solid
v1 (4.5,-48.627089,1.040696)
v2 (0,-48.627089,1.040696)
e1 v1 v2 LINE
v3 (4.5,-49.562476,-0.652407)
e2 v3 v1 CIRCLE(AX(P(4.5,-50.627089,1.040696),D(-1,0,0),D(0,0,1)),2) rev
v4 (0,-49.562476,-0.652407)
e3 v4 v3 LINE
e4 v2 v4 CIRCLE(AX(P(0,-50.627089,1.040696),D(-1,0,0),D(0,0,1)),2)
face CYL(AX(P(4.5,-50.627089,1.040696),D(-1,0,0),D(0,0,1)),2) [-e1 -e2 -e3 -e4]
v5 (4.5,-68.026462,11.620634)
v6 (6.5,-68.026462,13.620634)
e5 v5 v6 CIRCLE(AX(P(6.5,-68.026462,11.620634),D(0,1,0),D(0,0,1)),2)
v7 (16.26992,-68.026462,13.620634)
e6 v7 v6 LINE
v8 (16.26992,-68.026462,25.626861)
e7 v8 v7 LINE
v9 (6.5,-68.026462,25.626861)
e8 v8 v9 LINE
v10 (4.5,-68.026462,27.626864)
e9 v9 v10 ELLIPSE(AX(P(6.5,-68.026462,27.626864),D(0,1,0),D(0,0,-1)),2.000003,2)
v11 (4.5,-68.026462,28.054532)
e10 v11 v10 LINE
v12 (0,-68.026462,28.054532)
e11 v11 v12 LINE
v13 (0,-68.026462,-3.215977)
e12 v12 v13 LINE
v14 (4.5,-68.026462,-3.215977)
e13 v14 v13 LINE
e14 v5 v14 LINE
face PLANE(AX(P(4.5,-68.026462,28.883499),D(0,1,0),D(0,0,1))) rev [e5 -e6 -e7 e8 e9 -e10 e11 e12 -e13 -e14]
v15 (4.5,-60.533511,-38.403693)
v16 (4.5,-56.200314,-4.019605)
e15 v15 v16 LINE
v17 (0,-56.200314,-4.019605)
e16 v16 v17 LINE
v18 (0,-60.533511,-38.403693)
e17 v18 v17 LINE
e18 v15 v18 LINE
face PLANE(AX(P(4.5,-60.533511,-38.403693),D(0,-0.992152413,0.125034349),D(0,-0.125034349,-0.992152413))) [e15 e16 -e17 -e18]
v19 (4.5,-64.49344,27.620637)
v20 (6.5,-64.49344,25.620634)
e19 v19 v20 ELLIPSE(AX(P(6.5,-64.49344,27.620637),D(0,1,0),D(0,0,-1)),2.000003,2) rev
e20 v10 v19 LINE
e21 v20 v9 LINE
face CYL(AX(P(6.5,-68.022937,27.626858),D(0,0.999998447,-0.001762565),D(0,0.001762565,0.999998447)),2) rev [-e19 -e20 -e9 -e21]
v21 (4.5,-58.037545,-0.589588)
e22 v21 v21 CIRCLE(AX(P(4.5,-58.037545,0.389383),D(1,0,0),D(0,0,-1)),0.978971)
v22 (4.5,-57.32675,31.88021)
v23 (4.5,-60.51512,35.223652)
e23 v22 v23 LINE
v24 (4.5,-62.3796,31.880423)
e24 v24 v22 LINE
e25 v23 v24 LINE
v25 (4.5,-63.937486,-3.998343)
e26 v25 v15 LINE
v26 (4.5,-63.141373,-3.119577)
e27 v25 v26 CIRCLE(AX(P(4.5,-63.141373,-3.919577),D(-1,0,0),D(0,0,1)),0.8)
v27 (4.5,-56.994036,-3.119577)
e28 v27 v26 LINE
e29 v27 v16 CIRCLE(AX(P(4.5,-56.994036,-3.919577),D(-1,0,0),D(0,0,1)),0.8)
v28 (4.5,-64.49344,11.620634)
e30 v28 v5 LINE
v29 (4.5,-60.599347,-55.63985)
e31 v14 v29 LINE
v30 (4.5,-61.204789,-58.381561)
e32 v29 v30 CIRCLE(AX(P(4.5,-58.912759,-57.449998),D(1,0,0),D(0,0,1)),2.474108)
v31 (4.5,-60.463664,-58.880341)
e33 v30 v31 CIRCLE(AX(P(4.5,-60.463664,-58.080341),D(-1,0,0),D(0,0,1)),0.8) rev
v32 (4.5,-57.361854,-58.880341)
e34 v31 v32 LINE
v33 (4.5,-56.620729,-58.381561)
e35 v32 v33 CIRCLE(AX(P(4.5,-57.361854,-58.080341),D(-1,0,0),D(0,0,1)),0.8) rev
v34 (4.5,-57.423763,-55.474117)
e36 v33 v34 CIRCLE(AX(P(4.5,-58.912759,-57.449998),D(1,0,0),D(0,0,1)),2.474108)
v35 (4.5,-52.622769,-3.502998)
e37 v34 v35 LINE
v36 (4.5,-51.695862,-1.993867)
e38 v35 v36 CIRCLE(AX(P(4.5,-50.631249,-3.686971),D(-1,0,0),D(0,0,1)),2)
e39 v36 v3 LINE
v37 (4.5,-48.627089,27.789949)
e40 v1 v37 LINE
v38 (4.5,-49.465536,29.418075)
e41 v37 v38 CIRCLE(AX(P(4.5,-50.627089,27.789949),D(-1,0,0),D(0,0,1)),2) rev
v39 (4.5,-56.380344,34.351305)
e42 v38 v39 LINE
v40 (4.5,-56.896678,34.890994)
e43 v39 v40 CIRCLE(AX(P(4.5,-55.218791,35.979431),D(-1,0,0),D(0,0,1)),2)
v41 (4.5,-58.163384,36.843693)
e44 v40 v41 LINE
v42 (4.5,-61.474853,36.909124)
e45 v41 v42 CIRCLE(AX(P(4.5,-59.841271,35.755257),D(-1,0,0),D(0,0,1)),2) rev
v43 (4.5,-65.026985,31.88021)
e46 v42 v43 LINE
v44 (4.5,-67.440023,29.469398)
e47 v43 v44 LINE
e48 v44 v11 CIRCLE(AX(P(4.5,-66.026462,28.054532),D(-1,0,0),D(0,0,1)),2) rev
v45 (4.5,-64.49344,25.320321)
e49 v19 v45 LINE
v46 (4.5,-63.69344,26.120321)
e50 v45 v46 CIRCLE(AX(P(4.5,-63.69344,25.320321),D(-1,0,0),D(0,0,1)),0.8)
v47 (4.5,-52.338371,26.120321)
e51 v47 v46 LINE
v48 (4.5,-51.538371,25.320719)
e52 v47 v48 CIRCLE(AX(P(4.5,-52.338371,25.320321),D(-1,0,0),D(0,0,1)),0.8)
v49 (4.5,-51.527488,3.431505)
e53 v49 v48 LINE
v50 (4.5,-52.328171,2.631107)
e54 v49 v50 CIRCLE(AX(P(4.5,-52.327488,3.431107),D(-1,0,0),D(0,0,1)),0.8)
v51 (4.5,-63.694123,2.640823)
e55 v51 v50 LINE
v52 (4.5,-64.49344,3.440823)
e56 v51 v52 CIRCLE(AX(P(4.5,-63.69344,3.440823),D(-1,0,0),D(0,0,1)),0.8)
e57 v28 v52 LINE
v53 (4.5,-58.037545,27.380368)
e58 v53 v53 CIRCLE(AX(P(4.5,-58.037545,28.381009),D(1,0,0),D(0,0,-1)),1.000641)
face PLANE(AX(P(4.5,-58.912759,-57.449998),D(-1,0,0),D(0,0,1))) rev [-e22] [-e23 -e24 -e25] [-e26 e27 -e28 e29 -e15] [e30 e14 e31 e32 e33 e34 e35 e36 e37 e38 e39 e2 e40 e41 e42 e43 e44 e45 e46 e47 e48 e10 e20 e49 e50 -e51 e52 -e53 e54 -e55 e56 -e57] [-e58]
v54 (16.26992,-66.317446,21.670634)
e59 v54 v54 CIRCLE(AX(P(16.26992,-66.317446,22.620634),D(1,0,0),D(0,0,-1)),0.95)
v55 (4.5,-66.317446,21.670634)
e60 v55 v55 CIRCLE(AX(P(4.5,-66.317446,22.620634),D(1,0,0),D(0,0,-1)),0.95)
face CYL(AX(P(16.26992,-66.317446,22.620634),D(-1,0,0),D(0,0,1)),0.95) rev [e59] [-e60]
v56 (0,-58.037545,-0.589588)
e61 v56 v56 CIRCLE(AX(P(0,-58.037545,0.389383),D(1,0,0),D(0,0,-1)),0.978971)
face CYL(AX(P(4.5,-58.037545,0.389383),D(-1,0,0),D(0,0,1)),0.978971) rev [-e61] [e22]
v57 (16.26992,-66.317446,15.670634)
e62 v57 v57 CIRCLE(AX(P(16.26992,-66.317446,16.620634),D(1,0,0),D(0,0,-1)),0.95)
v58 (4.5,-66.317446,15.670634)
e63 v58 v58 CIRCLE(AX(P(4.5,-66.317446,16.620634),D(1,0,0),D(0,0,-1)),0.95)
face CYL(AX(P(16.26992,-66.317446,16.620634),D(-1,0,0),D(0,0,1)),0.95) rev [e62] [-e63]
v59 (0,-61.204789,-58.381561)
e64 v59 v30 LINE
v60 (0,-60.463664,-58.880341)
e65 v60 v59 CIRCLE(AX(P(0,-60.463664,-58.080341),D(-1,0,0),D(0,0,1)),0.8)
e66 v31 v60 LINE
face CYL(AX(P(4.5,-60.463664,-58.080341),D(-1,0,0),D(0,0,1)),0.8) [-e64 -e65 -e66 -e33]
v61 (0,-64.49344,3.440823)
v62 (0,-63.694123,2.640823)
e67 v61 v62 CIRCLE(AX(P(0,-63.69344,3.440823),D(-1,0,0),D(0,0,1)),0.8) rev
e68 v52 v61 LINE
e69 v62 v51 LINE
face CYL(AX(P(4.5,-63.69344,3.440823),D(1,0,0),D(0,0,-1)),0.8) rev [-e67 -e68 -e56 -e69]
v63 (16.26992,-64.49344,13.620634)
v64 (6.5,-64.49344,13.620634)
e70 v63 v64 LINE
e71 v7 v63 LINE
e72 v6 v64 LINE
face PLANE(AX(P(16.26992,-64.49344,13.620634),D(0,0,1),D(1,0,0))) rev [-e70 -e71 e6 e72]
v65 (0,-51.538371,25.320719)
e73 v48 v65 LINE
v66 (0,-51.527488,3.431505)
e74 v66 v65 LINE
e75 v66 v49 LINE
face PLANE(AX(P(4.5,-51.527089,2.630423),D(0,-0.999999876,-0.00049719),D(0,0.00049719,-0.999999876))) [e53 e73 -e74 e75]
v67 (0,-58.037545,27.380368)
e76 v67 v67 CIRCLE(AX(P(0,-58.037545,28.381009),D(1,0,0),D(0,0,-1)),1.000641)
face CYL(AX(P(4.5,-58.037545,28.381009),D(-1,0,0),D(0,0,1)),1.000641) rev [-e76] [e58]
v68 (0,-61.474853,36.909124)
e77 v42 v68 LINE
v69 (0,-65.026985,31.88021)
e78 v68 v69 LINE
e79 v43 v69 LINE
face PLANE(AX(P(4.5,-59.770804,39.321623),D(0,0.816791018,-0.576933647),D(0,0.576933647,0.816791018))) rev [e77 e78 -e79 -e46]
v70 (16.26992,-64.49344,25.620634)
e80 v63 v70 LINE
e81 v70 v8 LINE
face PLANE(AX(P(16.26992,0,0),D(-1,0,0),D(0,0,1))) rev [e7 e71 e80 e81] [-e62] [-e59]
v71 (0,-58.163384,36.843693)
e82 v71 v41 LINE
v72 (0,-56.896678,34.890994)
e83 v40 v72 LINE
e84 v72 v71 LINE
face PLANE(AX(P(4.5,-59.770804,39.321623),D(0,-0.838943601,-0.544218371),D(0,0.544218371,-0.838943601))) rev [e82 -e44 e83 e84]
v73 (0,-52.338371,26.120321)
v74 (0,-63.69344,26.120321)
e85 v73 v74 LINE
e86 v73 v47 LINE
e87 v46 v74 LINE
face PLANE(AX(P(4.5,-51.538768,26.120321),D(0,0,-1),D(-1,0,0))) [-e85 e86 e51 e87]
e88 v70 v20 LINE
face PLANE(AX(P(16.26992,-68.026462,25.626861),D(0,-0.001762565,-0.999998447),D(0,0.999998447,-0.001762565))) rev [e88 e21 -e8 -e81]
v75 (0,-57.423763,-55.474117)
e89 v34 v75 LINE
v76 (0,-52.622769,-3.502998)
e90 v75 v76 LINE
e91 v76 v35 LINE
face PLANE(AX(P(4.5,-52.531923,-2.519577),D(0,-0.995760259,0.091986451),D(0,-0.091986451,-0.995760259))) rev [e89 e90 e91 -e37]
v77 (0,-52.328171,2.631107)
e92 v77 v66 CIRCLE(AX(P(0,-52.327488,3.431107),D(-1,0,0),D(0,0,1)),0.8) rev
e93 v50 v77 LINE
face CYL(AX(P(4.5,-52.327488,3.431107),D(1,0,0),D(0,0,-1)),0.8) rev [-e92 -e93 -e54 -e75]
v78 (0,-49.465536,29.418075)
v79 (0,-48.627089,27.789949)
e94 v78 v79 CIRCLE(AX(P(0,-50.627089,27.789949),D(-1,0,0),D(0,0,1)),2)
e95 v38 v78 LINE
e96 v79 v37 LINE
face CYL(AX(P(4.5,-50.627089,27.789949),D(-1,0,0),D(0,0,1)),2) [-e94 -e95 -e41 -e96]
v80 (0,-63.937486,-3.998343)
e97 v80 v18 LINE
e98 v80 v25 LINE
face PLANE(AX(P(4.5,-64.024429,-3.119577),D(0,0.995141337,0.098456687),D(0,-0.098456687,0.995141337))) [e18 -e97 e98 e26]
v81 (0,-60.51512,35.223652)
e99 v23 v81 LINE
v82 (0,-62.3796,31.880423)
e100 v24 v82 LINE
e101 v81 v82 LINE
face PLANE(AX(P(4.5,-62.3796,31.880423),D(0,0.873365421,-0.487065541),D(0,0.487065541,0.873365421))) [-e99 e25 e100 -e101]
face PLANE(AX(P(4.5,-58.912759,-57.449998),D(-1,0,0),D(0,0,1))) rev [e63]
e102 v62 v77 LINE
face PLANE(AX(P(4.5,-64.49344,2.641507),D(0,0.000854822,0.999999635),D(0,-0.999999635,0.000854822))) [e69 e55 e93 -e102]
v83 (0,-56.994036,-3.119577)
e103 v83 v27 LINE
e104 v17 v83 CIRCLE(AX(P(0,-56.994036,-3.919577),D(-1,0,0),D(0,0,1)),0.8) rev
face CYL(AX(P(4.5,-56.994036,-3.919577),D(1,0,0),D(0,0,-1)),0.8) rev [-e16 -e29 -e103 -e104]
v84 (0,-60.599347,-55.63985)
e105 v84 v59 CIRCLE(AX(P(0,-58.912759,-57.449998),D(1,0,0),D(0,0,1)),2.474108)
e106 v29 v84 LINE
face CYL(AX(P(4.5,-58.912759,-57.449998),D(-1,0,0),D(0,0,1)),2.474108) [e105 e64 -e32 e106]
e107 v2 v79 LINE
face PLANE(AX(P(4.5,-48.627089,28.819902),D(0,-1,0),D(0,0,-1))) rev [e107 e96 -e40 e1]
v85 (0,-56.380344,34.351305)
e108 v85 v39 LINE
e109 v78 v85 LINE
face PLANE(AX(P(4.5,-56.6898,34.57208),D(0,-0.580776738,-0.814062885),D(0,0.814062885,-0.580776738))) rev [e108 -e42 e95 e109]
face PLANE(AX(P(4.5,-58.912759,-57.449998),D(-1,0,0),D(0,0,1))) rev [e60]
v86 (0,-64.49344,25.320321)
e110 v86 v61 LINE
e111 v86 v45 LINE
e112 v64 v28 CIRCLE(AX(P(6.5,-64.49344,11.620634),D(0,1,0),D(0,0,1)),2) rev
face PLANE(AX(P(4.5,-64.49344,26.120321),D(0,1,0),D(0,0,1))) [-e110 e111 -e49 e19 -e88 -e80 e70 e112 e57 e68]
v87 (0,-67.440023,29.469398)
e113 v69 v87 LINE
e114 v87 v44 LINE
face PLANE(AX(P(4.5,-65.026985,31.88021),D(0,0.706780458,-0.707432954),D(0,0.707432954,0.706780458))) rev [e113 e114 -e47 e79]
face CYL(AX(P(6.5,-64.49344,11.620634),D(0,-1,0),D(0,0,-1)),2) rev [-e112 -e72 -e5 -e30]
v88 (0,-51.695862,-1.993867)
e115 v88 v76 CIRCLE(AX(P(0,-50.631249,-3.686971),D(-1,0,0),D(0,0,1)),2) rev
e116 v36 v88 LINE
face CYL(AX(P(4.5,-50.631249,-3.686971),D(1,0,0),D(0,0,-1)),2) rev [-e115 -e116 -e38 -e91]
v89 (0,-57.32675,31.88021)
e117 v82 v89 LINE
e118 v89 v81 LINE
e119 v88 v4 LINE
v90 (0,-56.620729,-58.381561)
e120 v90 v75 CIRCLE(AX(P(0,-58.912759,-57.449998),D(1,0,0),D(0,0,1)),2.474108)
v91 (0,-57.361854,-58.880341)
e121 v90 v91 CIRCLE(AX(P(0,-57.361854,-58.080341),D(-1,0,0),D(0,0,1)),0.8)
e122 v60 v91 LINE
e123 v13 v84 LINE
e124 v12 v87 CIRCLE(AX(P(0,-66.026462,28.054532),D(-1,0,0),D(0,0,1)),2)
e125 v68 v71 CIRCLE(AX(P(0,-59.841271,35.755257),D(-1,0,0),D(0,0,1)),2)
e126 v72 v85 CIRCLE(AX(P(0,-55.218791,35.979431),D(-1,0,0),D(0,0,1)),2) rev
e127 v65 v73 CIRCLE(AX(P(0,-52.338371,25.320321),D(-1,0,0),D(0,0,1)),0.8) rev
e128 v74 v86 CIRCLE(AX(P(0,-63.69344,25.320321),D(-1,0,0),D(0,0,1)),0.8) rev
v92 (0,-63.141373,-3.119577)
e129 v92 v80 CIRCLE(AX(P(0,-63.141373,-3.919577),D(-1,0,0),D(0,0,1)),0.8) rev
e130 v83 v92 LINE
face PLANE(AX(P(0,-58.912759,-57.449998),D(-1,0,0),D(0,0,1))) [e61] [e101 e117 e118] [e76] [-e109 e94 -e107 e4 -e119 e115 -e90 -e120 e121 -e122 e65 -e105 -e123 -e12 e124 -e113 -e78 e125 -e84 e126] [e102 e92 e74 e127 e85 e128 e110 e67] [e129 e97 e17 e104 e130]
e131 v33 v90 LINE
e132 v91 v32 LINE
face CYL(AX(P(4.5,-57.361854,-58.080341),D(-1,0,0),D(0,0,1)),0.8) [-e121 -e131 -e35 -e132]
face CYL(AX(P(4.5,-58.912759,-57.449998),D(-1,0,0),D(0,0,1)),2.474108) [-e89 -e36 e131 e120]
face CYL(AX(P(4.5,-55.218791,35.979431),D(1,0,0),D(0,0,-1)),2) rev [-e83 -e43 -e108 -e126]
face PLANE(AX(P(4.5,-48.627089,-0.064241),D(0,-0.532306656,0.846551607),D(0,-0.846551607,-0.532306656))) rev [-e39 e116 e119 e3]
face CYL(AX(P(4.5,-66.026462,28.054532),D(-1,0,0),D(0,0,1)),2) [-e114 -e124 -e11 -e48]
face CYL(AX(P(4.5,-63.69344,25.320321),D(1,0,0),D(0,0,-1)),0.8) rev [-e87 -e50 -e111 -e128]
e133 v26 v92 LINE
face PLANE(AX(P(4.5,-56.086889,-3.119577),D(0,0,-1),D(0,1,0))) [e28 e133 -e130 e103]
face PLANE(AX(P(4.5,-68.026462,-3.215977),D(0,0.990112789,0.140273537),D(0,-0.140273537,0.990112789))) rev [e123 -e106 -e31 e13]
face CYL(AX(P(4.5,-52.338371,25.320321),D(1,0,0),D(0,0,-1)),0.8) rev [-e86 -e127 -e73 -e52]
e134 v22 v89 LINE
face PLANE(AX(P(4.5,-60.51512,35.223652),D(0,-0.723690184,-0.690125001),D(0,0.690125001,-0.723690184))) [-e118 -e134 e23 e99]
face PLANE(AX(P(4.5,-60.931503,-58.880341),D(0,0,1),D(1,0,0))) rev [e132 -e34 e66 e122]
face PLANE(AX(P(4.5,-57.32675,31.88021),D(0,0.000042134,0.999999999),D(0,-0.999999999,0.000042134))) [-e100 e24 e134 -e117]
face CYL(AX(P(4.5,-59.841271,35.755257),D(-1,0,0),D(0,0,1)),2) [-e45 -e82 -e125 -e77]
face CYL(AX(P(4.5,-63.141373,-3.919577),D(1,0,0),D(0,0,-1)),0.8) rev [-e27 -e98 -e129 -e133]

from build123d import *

# Parameters (mm, degrees)
SKETCH_1_R      = 0.978970723
SKETCH_1_R_2    = 1.00064107
EXTRUDE_1_DEPTH = 4.5
SKETCH_2_R      = 0.95
EXTRUDE_2_DEPTH = 11.76992
FILLET_1_R      = 2
FILLET_2_R      = 0.8


with BuildPart() as part:
    # 草图1 → 凸台-拉伸1 (new body)
    with BuildSketch(Plane(origin=(0, 0, 0), x_dir=(0, 0, -1), z_dir=(1, 0, 0))):
        with BuildLine():
            Line((-39.321623093, -59.770803947), (-31.880209784, -65.026985305))
            Line((-31.880209784, -65.026985305), (-28.883499317, -68.026462319))
            Line((-28.883499317, -68.026462319), (3.215977086, -68.026462319))
            Line((3.215977086, -68.026462319), (55.639850151, -60.599346768))
            ThreePointArc((55.639850151, -60.599346768), (57.197718569, -61.373971566), (58.88034135, -60.931503307))
            Line((58.88034135, -60.931503307), (58.88034135, -56.894014776))
            ThreePointArc((58.88034135, -56.894014776), (57.069785986, -56.468040051), (55.474117274, -57.423763105))
            Line((55.474117274, -57.423763105), (2.519577321, -52.531922747))
            Line((2.519577321, -52.531922747), (0.064241127, -48.627089366))
            Line((0.064241127, -48.627089366), (-28.81990203, -48.627089366))
            Line((-28.81990203, -48.627089366), (-34.57208033, -56.689800145))
            Line((-34.57208033, -56.689800145), (-39.321623093, -59.770803947))
        make_face()
        with Locations((-0.389382662, -58.037544978)):
            Circle(SKETCH_1_R, mode=Mode.SUBTRACT)
        with Locations((-28.381009123, -58.037544978)):
            Circle(SKETCH_1_R_2, mode=Mode.SUBTRACT)
        Polygon((-26.120321367, -51.538768317), (-26.120321367, -64.493439573), (-2.641506603, -64.493439573), (-2.630422679, -51.527089366), align=None, mode=Mode.SUBTRACT)
        Polygon((3.119577321, -56.086889198), (3.119577321, -64.024429188), (38.403692816, -60.533510862), align=None, mode=Mode.SUBTRACT)
        Polygon((-31.880209784, -57.326749532), (-31.880422679, -62.379599563), (-35.223651542, -60.515120464), align=None, mode=Mode.SUBTRACT)
    extrude(amount=EXTRUDE_1_DEPTH)

    # 草图2 → 凸台-拉伸2 (add)
    with BuildSketch(Plane(origin=(4.5, 0, 0), x_dir=(0, 0, -1), z_dir=(1, 0, 0))):
        Polygon((-25.62686112, -68.026462319), (-25.620633929, -64.493439573), (-13.620633929, -64.493439573), (-13.620633929, -68.026462319), align=None)
        with Locations((-22.620633929, -66.317445767)):
            Circle(SKETCH_2_R, mode=Mode.SUBTRACT)
        with Locations((-16.620633929, -66.317445767)):
            Circle(SKETCH_2_R, mode=Mode.SUBTRACT)
    extrude(amount=EXTRUDE_2_DEPTH)

    # 圆角1
    # the kernel refuses this fillet: 2 mm, written as the material it adds along each edge
    with BuildSketch(Plane(origin=(0, -56.689800145, 34.57208033), x_dir=(0, -0.5442183706519984, 0.8389436006340856), z_dir=(1, 0, 0))) as fillet_1_piece_1:
        with BuildLine():
            CenterArc((FILLET_1_R * 0.19006878131, -FILLET_1_R), FILLET_1_R, 90, 21.523541221)
            Line((-FILLET_1_R * 0.176814696818, -FILLET_1_R * 0.0697330955707), (0, 0))
            Line((0, 0), (FILLET_1_R * 0.19006878131, 0))
        make_face()
    extrude(amount=4.5)
    with BuildSketch(Plane(origin=(0, -52.531922747, -2.519577321), x_dir=(0, -0.09198645148038477, -0.9957602586687455), z_dir=(1, 0, 0))) as fillet_1_piece_2:
        with BuildLine():
            CenterArc((FILLET_1_R * 0.493803738743, FILLET_1_R), FILLET_1_R, 217.439335715, 52.560664285)
            Line((-FILLET_1_R * 0.30019370817, FILLET_1_R * 0.392078907838), (0, 0))
            Line((0, 0), (FILLET_1_R * 0.493803738743, 0))
        make_face()
    extrude(amount=4.5)
    with BuildSketch(Plane(origin=(4.5, -64.493439573, 13.620633929), x_dir=(0, 0, -1), z_dir=(0, -1, 0))) as fillet_1_piece_3:
        with BuildLine():
            CenterArc((FILLET_1_R, FILLET_1_R), FILLET_1_R, 180, 90)
            Line((0, FILLET_1_R), (0, 0))
            Line((0, 0), (FILLET_1_R, 0))
        make_face()
    extrude(amount=3.533022746)
    with BuildSketch(Plane(origin=(4.5, -73.026454553, 25.635673944), x_dir=(0, 0.0017625646835904966, 0.9999984466816618), z_dir=(0, 0.9999984466816617, -0.0017625646835904966))) as fillet_1_piece_4_section:
        with BuildLine():
            CenterArc((FILLET_1_R, FILLET_1_R), FILLET_1_R, 180, 90)
            Line((0, FILLET_1_R), (0, 0))
            Line((0, 0), (FILLET_1_R, 0))
        make_face()
    fillet_1_piece_4 = extrude(amount=13.533028234, mode=Mode.PRIVATE)
    fillet_1_piece_4 = split(fillet_1_piece_4, bisect_by=Plane(origin=(4.696560989, -68.026462319, 26.482181103), z_dir=(0, 1, 0)), keep=Keep.TOP, mode=Mode.PRIVATE)
    fillet_1_piece_4 = split(fillet_1_piece_4, bisect_by=Plane(origin=(4.696560989, -64.493439573, 26.482181103), z_dir=(0, -1, 0)), keep=Keep.TOP, mode=Mode.PRIVATE)
    add(fillet_1_piece_4)
    # the kernel refuses this fillet: 2 mm, written as the material it takes off along each edge
    with BuildSketch(Plane(origin=(-2.574882543, -48.627089366, 28.81990203), x_dir=(0, 0, -1), z_dir=(1, 0, 0))) as fillet_1_2_piece_1:
        with BuildLine():
            CenterArc((FILLET_1_R * 0.514976508546, -FILLET_1_R), FILLET_1_R, 90, 54.49480721)
            Line((-FILLET_1_R * 0.299086376608, -FILLET_1_R * 0.419223262333), (0, 0))
            Line((0, 0), (FILLET_1_R * 0.514976508546, 0))
        make_face()
    extrude(amount=9.649765085, mode=Mode.SUBTRACT)
    with BuildSketch(Plane(origin=(-2.762343959, -48.627089366, -0.064241127), x_dir=(0, -0.8465516071687306, -0.532306656355187), z_dir=(1, 0, 0))) as fillet_1_2_piece_2:
        with BuildLine():
            CenterArc((FILLET_1_R * 0.552468791842, -FILLET_1_R), FILLET_1_R, 90, 57.83856081)
            Line((-FILLET_1_R * 0.294082815326, -FILLET_1_R * 0.467693343645), (0, 0))
            Line((0, 0), (FILLET_1_R * 0.552468791842, 0))
        make_face()
    extrude(amount=10.024687918, mode=Mode.SUBTRACT)
    with BuildSketch(Plane(origin=(-2.072419305, -68.026462319, 28.883499317), x_dir=(0, 0.7074329539484039, 0.70678045789894), z_dir=(1, 0, 0))) as fillet_1_2_piece_3:
        with BuildLine():
            CenterArc((FILLET_1_R * 0.414483860929, -FILLET_1_R), FILLET_1_R, 90, 45.026435379)
            Line((-FILLET_1_R * 0.292949093019, -FILLET_1_R * 0.293219542101), (0, 0))
            Line((0, 0), (FILLET_1_R * 0.414483860929, 0))
        make_face()
    extrude(amount=8.644838609, mode=Mode.SUBTRACT)
    with BuildSketch(Plane(origin=(-7.384077235, -59.770803947, 39.321623093), x_dir=(0, -0.5769336472143782, -0.816791017771324), z_dir=(1, 0, 0))) as fillet_1_2_piece_4:
        with BuildLine():
            CenterArc((FILLET_1_R * 1.47681544699, FILLET_1_R), FILLET_1_R, 158.206425449, 111.793574551)
            Line((FILLET_1_R * 0.548287978811, FILLET_1_R * 1.37126370795), (0, 0))
            Line((0, 0), (FILLET_1_R * 1.47681544699, 0))
        make_face()
    extrude(amount=19.26815447, mode=Mode.SUBTRACT)

    # 圆角2
    fillet_2_edges = [part.edges().sort_by_distance(p)[0] for p in [
        (2.25, -56.894014776, -58.88034135),
        (2.25, -60.931503307, -58.88034135),
        (2.25, -51.527089366, 2.630422679),
        (2.25, -51.538768317, 26.120321367),
        (2.25, -64.493439573, 26.120321367),
        (2.25, -64.493439573, 2.641506603),
        (2.25, -56.086889198, -3.119577321),
        (2.25, -64.024429188, -3.119577321),
    ]]
    fillet(fillet_2_edges, radius=FILLET_2_R)


solid = part.part
